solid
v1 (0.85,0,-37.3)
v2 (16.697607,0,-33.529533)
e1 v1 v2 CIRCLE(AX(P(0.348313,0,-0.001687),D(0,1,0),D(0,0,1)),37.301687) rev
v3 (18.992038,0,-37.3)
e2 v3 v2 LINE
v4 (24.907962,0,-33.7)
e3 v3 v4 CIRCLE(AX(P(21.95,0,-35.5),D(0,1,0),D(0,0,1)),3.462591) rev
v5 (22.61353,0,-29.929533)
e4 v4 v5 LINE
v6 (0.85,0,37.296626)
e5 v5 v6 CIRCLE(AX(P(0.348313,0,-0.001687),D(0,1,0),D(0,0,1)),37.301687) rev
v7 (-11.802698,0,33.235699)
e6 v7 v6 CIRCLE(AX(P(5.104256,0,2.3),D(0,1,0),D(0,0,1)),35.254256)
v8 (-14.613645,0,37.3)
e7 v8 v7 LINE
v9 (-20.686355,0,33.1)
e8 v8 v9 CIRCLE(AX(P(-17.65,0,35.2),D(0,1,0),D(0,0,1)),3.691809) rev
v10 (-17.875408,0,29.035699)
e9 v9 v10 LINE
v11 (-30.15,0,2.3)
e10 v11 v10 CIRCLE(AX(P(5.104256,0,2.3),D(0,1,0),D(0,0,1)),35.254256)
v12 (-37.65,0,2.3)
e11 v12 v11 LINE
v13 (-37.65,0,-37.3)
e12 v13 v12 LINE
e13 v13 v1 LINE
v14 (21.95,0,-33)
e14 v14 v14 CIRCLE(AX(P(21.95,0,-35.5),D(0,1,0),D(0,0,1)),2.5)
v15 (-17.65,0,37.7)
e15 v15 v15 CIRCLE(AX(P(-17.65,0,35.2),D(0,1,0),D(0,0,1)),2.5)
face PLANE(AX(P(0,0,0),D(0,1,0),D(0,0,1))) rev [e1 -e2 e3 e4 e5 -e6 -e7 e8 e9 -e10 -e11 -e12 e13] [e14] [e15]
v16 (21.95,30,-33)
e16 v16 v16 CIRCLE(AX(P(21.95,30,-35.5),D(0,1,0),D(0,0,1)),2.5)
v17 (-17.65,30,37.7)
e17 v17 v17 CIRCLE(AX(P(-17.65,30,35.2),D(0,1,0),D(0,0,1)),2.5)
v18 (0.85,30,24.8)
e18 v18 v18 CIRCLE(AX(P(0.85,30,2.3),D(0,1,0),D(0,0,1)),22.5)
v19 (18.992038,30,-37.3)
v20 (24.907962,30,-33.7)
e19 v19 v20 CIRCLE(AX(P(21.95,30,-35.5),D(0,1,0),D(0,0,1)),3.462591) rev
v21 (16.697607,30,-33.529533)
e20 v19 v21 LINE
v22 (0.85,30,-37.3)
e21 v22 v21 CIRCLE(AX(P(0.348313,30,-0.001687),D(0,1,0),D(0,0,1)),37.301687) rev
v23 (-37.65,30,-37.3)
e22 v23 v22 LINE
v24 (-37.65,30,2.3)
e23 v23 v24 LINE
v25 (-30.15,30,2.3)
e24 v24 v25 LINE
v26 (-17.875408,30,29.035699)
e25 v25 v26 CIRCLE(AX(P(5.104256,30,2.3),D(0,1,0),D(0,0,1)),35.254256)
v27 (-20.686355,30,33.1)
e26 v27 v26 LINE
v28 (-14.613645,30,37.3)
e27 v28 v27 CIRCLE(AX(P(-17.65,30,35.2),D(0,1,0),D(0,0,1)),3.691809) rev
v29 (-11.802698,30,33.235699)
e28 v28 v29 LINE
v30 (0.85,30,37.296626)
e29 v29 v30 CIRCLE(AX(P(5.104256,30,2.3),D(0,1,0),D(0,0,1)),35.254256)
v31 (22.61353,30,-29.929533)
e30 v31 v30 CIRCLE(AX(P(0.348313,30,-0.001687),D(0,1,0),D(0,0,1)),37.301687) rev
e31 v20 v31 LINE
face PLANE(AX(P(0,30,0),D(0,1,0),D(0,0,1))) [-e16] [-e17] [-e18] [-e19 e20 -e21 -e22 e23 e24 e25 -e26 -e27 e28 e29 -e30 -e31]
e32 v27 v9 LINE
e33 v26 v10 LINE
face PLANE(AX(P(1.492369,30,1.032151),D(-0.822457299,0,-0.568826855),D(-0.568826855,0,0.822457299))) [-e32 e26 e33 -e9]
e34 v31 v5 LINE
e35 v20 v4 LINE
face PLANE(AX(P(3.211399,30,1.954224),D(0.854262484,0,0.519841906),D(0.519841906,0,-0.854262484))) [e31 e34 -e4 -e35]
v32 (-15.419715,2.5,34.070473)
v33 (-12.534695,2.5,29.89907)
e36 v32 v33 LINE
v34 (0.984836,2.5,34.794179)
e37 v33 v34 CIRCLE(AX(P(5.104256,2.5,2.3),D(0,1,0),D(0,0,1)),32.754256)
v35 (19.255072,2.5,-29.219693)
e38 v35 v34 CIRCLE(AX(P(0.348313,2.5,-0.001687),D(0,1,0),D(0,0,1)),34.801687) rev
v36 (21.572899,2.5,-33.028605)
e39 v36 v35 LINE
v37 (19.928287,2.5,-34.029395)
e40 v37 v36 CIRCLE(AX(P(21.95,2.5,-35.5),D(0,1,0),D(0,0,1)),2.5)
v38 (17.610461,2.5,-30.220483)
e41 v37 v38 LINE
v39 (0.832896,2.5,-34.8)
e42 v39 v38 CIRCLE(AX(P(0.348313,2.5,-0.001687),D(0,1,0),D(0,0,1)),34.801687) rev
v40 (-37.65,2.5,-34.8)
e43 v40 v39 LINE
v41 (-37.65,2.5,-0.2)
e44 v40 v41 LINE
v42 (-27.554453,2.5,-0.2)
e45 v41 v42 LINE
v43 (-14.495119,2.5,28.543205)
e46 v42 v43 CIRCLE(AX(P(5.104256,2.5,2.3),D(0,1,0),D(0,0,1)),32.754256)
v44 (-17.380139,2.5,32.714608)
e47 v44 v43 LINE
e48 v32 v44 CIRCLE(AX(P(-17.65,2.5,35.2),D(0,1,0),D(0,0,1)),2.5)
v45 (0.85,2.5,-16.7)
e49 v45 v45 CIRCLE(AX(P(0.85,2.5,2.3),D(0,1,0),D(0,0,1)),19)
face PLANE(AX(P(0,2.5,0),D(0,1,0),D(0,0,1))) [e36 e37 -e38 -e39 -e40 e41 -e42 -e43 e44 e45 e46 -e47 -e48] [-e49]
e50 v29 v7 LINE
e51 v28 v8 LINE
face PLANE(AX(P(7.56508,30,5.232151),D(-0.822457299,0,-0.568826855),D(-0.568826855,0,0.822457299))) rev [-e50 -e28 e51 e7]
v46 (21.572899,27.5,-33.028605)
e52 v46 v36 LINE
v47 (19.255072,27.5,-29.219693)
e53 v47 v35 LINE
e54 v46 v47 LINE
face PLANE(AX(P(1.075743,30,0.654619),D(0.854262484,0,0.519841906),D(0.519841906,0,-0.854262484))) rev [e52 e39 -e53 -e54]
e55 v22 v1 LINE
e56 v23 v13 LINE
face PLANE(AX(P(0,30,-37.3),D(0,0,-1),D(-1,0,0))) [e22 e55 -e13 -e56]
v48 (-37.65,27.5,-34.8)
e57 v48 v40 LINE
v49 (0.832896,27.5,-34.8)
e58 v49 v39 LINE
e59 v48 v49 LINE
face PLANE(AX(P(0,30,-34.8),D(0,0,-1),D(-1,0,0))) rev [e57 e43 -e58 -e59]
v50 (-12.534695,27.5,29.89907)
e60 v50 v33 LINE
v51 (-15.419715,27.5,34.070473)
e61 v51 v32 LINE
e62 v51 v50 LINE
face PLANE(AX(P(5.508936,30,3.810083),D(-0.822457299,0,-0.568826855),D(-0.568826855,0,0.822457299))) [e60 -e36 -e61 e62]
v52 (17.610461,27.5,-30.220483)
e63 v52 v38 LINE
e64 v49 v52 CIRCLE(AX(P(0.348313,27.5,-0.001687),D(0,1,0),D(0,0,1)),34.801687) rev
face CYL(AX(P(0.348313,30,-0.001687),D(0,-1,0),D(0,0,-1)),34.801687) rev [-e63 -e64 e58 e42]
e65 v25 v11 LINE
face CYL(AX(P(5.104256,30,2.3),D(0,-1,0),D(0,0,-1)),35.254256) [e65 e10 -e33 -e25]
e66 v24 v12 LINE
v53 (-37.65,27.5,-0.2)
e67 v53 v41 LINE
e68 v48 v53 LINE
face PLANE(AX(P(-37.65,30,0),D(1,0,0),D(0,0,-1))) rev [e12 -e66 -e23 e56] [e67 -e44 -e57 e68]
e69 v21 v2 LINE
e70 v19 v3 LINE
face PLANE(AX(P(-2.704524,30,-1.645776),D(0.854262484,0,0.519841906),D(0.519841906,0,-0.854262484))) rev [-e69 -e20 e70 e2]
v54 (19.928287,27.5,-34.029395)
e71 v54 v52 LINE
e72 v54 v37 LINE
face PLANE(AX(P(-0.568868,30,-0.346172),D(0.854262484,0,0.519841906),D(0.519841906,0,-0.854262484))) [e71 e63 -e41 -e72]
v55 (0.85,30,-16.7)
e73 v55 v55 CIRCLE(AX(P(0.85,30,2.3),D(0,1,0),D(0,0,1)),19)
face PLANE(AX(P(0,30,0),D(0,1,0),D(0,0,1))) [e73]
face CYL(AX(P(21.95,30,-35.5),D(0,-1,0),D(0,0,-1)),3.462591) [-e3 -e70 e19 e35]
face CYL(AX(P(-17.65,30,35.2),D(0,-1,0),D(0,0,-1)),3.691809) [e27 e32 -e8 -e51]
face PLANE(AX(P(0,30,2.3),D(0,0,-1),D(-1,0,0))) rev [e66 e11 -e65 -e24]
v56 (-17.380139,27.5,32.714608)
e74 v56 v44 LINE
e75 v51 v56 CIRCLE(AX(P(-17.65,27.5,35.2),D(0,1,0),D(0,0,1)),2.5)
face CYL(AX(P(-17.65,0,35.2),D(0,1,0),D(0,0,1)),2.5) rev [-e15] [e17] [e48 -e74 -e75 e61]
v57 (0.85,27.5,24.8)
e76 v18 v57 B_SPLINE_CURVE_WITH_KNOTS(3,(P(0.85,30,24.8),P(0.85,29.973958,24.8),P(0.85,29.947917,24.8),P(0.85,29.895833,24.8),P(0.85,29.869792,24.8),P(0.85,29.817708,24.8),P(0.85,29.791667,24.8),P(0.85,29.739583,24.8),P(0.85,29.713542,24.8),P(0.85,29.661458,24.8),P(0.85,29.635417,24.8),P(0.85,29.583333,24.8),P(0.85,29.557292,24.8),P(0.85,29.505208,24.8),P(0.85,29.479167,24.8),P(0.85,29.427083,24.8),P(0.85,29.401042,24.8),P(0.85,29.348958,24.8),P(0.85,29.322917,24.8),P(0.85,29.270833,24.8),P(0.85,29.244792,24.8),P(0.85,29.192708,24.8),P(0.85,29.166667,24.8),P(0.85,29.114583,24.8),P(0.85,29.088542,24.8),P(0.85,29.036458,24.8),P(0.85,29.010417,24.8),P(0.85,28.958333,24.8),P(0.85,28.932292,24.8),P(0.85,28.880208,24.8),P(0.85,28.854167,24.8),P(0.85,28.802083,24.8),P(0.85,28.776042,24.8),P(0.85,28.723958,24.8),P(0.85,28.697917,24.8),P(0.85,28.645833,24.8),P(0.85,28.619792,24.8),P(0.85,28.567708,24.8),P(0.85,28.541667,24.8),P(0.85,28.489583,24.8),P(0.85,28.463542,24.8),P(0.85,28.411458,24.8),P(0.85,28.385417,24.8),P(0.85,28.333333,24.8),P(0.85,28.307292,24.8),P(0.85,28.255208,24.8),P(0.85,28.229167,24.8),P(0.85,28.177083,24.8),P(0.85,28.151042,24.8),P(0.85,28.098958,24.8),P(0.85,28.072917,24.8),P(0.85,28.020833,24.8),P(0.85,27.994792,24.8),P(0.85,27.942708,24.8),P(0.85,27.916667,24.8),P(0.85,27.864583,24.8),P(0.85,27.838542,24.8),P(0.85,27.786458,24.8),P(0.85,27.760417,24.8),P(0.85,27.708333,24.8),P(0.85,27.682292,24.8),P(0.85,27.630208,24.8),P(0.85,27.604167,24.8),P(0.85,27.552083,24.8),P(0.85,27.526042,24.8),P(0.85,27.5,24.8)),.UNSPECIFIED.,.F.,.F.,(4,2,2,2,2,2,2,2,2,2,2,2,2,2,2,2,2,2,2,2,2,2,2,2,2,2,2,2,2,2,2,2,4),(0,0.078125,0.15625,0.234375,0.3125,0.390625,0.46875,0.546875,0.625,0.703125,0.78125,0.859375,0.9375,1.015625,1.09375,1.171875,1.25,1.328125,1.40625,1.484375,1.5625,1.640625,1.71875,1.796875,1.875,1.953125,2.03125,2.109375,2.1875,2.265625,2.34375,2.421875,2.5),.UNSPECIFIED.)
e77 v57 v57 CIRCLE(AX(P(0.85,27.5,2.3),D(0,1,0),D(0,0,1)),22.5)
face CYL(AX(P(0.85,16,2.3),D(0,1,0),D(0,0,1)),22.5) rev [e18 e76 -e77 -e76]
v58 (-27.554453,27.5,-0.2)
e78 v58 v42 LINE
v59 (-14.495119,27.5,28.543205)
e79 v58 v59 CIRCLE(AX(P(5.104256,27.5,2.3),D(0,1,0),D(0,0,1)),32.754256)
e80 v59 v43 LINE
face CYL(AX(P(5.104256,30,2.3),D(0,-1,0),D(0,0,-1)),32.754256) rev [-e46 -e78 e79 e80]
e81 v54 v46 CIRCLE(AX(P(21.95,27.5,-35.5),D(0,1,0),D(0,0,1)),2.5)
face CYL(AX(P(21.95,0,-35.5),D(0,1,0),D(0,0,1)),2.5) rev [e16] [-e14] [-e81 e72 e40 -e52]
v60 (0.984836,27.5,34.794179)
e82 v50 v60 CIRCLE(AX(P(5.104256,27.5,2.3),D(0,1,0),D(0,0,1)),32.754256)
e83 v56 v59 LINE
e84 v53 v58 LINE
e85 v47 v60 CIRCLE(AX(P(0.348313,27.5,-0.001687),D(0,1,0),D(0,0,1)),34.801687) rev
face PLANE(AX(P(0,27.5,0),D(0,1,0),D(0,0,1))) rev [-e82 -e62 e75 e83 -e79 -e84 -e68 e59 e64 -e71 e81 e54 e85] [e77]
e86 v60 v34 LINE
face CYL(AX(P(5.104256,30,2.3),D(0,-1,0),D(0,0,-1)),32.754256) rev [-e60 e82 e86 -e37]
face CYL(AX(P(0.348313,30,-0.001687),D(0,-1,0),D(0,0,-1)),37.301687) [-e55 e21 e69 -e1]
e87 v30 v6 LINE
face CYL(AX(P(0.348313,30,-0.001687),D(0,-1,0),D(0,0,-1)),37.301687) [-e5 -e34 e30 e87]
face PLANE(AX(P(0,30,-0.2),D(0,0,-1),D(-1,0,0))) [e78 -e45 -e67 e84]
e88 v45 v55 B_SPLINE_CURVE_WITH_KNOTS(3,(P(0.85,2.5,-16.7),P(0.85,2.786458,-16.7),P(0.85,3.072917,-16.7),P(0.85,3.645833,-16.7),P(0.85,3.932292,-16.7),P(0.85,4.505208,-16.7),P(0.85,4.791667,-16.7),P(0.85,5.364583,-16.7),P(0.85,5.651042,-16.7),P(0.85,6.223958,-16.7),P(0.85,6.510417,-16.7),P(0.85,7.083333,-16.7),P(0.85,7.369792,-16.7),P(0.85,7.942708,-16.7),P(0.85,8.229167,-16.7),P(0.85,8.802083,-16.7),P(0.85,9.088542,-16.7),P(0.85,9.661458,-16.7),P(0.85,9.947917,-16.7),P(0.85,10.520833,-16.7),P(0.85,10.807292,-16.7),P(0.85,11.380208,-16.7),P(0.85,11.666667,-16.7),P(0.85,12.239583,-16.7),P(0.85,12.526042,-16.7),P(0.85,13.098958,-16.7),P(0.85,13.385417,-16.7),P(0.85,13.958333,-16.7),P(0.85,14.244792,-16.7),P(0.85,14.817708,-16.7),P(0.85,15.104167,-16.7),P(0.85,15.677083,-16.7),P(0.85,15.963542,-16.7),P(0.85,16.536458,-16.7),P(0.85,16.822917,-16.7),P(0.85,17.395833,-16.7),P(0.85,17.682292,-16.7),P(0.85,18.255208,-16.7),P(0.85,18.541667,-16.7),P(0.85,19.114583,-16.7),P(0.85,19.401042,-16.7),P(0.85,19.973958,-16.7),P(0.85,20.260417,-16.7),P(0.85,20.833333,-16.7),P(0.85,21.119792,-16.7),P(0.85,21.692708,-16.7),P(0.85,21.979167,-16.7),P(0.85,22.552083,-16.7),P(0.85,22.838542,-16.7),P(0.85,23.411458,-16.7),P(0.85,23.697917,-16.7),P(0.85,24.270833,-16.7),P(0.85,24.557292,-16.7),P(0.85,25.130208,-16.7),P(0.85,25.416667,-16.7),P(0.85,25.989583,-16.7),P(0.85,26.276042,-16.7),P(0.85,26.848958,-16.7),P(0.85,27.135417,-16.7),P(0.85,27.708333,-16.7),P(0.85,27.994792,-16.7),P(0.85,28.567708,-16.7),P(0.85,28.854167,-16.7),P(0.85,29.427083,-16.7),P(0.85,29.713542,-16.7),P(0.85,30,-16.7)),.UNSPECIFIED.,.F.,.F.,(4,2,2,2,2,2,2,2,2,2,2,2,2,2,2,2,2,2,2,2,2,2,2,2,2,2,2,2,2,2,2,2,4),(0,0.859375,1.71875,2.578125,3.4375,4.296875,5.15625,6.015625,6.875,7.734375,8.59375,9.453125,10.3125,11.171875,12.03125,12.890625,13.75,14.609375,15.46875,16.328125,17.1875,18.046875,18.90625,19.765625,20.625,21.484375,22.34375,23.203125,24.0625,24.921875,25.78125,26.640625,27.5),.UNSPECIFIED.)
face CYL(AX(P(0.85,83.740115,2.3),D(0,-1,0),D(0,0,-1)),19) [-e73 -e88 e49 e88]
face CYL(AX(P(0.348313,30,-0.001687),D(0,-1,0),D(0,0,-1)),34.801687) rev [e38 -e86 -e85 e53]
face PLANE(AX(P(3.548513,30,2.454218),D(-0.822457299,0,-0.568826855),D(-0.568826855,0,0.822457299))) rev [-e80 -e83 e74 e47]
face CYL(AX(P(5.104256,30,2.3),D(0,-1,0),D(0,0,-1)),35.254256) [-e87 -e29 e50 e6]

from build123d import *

# Parameters (mm, degrees)
BOSS_EXTRUDE1_DEPTH = 30
SHELL1_START        = 2.5
SHELL1_DEPTH        = 25
SKETCH2_R           = 22.5
CUT_EXTRUDE1_DEPTH  = 14
SKETCH3_R           = 19
BOSS_EXTRUDE2_DEPTH = 27.5
SKETCH4_R           = 2.5
CUT_EXTRUDE2_DEPTH  = 62.932269548


# Read off the part's stored shape, not the designer's step: Shell1
with BuildPart() as part:
    # Sketch1 → Boss-Extrude1 (new body)
    with BuildSketch(Plane(origin=(0, 0, 0), x_dir=(1, 0, 0), z_dir=(0, 1, 0))):
        with BuildLine():
            Line((0.85, 37.3), (-37.65, 37.3))
            Line((-37.65, 37.3), (-37.65, -2.3))
            Line((-37.65, -2.3), (-30.15, -2.3))
            ThreePointArc((-30.15, -2.3), (-26.934732226, -17.009377839), (-17.875408278, -29.035698675))
            Line((-17.875408278, -29.035698675), (-20.686355111, -33.1))
            ThreePointArc((-20.686355111, -33.1), (-19.75, -38.236355111), (-14.613644889, -37.3))
            Line((-14.613644889, -37.3), (-11.802698056, -33.235698675))
            ThreePointArc((-11.802698056, -33.235698675), (-5.669414959, -35.867701083), (0.85, -37.296626142))
            ThreePointArc((0.85, -37.296626142), (35.836650455, -11.487166691), (22.613530114, 29.929532788))
            Line((22.613530114, 29.929532788), (24.907961743, 33.7))
            ThreePointArc((24.907961743, 33.7), (23.75, 38.457961743), (18.992038257, 37.3))
            Line((18.992038257, 37.3), (16.697606627, 33.529532788))
            ThreePointArc((16.697606627, 33.529532788), (8.982141398, 36.290429758), (0.85, 37.3))
        make_face()
    extrude(amount=BOSS_EXTRUDE1_DEPTH)

    # Shell1 outline → Shell1 (cut)
    with BuildSketch(Plane(origin=(0, 0, 0), x_dir=(1, 0, 0), z_dir=(0, 1, 0)).offset(SHELL1_START)):
        with BuildLine():
            Line((-16.669788137, -35.877932863), (-12.534694931, -29.899070296))
            ThreePointArc((-12.534694931, -29.899070296), (-6.046851448, -33.097630874), (0.984836041, -34.794178509))
            ThreePointArc((0.984836041, -34.794178509), (33.813651871, -9.549674864), (19.255072264, 29.219692849))
            Line((19.255072264, 29.219692849), (22.772305532, 34.999604766))
            ThreePointArc((22.772305532, 34.999604766), (22.450395234, 36.322305532), (21.127694468, 36.000395234))
            Line((21.127694468, 36.000395234), (17.610461199, 30.220483316))
            ThreePointArc((17.610461199, 30.220483316), (9.512351913, 33.575155698), (0.832895868, 34.8))
            Line((0.832895868, 34.8), (-37.65, 34.8))
            Line((-37.65, 34.8), (-37.65, 0.2))
            Line((-37.65, 0.2), (-27.554453191, 0.2))
            ThreePointArc((-27.554453191, 0.2), (-24.716370884, -15.848855872), (-14.495118657, -28.543204571))
            Line((-14.495118657, -28.543204571), (-18.630211863, -34.522067137))
            ThreePointArc((-18.630211863, -34.522067137), (-18.327932863, -36.180211863), (-16.669788137, -35.877932863))
        make_face()
    extrude(amount=SHELL1_DEPTH, mode=Mode.SUBTRACT)

    # Sketch2 → Cut-Extrude1 (cut)
    with BuildSketch(Plane(origin=(0, 30, 0), x_dir=(1, 0, 0), z_dir=(0, 1, 0))):
        with Locations(Location((0.85, -2.3, 0), (0, 0, 270))):
            Circle(SKETCH2_R)
    extrude(amount=-CUT_EXTRUDE1_DEPTH, mode=Mode.SUBTRACT)

    # Sketch3 → Boss-Extrude2 (add)
    with BuildSketch(Plane(origin=(0, 2.5, 0), x_dir=(1, 0, 0), z_dir=(0, 1, 0))):
        with Locations(Location((0.85, -2.3, 0), (0, 0, 90))):
            Circle(SKETCH3_R)
    extrude(amount=BOSS_EXTRUDE2_DEPTH)

    # Sketch4 → Cut-Extrude2 (cut, through all)
    with BuildSketch(Plane(origin=(0, 30, 0), x_dir=(1, 0, 0), z_dir=(0, 1, 0))):
        with Locations(Location((21.95, 35.5, 0), (0, 0, 270))):
            Circle(SKETCH4_R)
        with Locations(Location((-17.65, -35.2, 0), (0, 0, 270))):
            Circle(SKETCH4_R)
    extrude(amount=-CUT_EXTRUDE2_DEPTH, mode=Mode.SUBTRACT)


solid = part.part
